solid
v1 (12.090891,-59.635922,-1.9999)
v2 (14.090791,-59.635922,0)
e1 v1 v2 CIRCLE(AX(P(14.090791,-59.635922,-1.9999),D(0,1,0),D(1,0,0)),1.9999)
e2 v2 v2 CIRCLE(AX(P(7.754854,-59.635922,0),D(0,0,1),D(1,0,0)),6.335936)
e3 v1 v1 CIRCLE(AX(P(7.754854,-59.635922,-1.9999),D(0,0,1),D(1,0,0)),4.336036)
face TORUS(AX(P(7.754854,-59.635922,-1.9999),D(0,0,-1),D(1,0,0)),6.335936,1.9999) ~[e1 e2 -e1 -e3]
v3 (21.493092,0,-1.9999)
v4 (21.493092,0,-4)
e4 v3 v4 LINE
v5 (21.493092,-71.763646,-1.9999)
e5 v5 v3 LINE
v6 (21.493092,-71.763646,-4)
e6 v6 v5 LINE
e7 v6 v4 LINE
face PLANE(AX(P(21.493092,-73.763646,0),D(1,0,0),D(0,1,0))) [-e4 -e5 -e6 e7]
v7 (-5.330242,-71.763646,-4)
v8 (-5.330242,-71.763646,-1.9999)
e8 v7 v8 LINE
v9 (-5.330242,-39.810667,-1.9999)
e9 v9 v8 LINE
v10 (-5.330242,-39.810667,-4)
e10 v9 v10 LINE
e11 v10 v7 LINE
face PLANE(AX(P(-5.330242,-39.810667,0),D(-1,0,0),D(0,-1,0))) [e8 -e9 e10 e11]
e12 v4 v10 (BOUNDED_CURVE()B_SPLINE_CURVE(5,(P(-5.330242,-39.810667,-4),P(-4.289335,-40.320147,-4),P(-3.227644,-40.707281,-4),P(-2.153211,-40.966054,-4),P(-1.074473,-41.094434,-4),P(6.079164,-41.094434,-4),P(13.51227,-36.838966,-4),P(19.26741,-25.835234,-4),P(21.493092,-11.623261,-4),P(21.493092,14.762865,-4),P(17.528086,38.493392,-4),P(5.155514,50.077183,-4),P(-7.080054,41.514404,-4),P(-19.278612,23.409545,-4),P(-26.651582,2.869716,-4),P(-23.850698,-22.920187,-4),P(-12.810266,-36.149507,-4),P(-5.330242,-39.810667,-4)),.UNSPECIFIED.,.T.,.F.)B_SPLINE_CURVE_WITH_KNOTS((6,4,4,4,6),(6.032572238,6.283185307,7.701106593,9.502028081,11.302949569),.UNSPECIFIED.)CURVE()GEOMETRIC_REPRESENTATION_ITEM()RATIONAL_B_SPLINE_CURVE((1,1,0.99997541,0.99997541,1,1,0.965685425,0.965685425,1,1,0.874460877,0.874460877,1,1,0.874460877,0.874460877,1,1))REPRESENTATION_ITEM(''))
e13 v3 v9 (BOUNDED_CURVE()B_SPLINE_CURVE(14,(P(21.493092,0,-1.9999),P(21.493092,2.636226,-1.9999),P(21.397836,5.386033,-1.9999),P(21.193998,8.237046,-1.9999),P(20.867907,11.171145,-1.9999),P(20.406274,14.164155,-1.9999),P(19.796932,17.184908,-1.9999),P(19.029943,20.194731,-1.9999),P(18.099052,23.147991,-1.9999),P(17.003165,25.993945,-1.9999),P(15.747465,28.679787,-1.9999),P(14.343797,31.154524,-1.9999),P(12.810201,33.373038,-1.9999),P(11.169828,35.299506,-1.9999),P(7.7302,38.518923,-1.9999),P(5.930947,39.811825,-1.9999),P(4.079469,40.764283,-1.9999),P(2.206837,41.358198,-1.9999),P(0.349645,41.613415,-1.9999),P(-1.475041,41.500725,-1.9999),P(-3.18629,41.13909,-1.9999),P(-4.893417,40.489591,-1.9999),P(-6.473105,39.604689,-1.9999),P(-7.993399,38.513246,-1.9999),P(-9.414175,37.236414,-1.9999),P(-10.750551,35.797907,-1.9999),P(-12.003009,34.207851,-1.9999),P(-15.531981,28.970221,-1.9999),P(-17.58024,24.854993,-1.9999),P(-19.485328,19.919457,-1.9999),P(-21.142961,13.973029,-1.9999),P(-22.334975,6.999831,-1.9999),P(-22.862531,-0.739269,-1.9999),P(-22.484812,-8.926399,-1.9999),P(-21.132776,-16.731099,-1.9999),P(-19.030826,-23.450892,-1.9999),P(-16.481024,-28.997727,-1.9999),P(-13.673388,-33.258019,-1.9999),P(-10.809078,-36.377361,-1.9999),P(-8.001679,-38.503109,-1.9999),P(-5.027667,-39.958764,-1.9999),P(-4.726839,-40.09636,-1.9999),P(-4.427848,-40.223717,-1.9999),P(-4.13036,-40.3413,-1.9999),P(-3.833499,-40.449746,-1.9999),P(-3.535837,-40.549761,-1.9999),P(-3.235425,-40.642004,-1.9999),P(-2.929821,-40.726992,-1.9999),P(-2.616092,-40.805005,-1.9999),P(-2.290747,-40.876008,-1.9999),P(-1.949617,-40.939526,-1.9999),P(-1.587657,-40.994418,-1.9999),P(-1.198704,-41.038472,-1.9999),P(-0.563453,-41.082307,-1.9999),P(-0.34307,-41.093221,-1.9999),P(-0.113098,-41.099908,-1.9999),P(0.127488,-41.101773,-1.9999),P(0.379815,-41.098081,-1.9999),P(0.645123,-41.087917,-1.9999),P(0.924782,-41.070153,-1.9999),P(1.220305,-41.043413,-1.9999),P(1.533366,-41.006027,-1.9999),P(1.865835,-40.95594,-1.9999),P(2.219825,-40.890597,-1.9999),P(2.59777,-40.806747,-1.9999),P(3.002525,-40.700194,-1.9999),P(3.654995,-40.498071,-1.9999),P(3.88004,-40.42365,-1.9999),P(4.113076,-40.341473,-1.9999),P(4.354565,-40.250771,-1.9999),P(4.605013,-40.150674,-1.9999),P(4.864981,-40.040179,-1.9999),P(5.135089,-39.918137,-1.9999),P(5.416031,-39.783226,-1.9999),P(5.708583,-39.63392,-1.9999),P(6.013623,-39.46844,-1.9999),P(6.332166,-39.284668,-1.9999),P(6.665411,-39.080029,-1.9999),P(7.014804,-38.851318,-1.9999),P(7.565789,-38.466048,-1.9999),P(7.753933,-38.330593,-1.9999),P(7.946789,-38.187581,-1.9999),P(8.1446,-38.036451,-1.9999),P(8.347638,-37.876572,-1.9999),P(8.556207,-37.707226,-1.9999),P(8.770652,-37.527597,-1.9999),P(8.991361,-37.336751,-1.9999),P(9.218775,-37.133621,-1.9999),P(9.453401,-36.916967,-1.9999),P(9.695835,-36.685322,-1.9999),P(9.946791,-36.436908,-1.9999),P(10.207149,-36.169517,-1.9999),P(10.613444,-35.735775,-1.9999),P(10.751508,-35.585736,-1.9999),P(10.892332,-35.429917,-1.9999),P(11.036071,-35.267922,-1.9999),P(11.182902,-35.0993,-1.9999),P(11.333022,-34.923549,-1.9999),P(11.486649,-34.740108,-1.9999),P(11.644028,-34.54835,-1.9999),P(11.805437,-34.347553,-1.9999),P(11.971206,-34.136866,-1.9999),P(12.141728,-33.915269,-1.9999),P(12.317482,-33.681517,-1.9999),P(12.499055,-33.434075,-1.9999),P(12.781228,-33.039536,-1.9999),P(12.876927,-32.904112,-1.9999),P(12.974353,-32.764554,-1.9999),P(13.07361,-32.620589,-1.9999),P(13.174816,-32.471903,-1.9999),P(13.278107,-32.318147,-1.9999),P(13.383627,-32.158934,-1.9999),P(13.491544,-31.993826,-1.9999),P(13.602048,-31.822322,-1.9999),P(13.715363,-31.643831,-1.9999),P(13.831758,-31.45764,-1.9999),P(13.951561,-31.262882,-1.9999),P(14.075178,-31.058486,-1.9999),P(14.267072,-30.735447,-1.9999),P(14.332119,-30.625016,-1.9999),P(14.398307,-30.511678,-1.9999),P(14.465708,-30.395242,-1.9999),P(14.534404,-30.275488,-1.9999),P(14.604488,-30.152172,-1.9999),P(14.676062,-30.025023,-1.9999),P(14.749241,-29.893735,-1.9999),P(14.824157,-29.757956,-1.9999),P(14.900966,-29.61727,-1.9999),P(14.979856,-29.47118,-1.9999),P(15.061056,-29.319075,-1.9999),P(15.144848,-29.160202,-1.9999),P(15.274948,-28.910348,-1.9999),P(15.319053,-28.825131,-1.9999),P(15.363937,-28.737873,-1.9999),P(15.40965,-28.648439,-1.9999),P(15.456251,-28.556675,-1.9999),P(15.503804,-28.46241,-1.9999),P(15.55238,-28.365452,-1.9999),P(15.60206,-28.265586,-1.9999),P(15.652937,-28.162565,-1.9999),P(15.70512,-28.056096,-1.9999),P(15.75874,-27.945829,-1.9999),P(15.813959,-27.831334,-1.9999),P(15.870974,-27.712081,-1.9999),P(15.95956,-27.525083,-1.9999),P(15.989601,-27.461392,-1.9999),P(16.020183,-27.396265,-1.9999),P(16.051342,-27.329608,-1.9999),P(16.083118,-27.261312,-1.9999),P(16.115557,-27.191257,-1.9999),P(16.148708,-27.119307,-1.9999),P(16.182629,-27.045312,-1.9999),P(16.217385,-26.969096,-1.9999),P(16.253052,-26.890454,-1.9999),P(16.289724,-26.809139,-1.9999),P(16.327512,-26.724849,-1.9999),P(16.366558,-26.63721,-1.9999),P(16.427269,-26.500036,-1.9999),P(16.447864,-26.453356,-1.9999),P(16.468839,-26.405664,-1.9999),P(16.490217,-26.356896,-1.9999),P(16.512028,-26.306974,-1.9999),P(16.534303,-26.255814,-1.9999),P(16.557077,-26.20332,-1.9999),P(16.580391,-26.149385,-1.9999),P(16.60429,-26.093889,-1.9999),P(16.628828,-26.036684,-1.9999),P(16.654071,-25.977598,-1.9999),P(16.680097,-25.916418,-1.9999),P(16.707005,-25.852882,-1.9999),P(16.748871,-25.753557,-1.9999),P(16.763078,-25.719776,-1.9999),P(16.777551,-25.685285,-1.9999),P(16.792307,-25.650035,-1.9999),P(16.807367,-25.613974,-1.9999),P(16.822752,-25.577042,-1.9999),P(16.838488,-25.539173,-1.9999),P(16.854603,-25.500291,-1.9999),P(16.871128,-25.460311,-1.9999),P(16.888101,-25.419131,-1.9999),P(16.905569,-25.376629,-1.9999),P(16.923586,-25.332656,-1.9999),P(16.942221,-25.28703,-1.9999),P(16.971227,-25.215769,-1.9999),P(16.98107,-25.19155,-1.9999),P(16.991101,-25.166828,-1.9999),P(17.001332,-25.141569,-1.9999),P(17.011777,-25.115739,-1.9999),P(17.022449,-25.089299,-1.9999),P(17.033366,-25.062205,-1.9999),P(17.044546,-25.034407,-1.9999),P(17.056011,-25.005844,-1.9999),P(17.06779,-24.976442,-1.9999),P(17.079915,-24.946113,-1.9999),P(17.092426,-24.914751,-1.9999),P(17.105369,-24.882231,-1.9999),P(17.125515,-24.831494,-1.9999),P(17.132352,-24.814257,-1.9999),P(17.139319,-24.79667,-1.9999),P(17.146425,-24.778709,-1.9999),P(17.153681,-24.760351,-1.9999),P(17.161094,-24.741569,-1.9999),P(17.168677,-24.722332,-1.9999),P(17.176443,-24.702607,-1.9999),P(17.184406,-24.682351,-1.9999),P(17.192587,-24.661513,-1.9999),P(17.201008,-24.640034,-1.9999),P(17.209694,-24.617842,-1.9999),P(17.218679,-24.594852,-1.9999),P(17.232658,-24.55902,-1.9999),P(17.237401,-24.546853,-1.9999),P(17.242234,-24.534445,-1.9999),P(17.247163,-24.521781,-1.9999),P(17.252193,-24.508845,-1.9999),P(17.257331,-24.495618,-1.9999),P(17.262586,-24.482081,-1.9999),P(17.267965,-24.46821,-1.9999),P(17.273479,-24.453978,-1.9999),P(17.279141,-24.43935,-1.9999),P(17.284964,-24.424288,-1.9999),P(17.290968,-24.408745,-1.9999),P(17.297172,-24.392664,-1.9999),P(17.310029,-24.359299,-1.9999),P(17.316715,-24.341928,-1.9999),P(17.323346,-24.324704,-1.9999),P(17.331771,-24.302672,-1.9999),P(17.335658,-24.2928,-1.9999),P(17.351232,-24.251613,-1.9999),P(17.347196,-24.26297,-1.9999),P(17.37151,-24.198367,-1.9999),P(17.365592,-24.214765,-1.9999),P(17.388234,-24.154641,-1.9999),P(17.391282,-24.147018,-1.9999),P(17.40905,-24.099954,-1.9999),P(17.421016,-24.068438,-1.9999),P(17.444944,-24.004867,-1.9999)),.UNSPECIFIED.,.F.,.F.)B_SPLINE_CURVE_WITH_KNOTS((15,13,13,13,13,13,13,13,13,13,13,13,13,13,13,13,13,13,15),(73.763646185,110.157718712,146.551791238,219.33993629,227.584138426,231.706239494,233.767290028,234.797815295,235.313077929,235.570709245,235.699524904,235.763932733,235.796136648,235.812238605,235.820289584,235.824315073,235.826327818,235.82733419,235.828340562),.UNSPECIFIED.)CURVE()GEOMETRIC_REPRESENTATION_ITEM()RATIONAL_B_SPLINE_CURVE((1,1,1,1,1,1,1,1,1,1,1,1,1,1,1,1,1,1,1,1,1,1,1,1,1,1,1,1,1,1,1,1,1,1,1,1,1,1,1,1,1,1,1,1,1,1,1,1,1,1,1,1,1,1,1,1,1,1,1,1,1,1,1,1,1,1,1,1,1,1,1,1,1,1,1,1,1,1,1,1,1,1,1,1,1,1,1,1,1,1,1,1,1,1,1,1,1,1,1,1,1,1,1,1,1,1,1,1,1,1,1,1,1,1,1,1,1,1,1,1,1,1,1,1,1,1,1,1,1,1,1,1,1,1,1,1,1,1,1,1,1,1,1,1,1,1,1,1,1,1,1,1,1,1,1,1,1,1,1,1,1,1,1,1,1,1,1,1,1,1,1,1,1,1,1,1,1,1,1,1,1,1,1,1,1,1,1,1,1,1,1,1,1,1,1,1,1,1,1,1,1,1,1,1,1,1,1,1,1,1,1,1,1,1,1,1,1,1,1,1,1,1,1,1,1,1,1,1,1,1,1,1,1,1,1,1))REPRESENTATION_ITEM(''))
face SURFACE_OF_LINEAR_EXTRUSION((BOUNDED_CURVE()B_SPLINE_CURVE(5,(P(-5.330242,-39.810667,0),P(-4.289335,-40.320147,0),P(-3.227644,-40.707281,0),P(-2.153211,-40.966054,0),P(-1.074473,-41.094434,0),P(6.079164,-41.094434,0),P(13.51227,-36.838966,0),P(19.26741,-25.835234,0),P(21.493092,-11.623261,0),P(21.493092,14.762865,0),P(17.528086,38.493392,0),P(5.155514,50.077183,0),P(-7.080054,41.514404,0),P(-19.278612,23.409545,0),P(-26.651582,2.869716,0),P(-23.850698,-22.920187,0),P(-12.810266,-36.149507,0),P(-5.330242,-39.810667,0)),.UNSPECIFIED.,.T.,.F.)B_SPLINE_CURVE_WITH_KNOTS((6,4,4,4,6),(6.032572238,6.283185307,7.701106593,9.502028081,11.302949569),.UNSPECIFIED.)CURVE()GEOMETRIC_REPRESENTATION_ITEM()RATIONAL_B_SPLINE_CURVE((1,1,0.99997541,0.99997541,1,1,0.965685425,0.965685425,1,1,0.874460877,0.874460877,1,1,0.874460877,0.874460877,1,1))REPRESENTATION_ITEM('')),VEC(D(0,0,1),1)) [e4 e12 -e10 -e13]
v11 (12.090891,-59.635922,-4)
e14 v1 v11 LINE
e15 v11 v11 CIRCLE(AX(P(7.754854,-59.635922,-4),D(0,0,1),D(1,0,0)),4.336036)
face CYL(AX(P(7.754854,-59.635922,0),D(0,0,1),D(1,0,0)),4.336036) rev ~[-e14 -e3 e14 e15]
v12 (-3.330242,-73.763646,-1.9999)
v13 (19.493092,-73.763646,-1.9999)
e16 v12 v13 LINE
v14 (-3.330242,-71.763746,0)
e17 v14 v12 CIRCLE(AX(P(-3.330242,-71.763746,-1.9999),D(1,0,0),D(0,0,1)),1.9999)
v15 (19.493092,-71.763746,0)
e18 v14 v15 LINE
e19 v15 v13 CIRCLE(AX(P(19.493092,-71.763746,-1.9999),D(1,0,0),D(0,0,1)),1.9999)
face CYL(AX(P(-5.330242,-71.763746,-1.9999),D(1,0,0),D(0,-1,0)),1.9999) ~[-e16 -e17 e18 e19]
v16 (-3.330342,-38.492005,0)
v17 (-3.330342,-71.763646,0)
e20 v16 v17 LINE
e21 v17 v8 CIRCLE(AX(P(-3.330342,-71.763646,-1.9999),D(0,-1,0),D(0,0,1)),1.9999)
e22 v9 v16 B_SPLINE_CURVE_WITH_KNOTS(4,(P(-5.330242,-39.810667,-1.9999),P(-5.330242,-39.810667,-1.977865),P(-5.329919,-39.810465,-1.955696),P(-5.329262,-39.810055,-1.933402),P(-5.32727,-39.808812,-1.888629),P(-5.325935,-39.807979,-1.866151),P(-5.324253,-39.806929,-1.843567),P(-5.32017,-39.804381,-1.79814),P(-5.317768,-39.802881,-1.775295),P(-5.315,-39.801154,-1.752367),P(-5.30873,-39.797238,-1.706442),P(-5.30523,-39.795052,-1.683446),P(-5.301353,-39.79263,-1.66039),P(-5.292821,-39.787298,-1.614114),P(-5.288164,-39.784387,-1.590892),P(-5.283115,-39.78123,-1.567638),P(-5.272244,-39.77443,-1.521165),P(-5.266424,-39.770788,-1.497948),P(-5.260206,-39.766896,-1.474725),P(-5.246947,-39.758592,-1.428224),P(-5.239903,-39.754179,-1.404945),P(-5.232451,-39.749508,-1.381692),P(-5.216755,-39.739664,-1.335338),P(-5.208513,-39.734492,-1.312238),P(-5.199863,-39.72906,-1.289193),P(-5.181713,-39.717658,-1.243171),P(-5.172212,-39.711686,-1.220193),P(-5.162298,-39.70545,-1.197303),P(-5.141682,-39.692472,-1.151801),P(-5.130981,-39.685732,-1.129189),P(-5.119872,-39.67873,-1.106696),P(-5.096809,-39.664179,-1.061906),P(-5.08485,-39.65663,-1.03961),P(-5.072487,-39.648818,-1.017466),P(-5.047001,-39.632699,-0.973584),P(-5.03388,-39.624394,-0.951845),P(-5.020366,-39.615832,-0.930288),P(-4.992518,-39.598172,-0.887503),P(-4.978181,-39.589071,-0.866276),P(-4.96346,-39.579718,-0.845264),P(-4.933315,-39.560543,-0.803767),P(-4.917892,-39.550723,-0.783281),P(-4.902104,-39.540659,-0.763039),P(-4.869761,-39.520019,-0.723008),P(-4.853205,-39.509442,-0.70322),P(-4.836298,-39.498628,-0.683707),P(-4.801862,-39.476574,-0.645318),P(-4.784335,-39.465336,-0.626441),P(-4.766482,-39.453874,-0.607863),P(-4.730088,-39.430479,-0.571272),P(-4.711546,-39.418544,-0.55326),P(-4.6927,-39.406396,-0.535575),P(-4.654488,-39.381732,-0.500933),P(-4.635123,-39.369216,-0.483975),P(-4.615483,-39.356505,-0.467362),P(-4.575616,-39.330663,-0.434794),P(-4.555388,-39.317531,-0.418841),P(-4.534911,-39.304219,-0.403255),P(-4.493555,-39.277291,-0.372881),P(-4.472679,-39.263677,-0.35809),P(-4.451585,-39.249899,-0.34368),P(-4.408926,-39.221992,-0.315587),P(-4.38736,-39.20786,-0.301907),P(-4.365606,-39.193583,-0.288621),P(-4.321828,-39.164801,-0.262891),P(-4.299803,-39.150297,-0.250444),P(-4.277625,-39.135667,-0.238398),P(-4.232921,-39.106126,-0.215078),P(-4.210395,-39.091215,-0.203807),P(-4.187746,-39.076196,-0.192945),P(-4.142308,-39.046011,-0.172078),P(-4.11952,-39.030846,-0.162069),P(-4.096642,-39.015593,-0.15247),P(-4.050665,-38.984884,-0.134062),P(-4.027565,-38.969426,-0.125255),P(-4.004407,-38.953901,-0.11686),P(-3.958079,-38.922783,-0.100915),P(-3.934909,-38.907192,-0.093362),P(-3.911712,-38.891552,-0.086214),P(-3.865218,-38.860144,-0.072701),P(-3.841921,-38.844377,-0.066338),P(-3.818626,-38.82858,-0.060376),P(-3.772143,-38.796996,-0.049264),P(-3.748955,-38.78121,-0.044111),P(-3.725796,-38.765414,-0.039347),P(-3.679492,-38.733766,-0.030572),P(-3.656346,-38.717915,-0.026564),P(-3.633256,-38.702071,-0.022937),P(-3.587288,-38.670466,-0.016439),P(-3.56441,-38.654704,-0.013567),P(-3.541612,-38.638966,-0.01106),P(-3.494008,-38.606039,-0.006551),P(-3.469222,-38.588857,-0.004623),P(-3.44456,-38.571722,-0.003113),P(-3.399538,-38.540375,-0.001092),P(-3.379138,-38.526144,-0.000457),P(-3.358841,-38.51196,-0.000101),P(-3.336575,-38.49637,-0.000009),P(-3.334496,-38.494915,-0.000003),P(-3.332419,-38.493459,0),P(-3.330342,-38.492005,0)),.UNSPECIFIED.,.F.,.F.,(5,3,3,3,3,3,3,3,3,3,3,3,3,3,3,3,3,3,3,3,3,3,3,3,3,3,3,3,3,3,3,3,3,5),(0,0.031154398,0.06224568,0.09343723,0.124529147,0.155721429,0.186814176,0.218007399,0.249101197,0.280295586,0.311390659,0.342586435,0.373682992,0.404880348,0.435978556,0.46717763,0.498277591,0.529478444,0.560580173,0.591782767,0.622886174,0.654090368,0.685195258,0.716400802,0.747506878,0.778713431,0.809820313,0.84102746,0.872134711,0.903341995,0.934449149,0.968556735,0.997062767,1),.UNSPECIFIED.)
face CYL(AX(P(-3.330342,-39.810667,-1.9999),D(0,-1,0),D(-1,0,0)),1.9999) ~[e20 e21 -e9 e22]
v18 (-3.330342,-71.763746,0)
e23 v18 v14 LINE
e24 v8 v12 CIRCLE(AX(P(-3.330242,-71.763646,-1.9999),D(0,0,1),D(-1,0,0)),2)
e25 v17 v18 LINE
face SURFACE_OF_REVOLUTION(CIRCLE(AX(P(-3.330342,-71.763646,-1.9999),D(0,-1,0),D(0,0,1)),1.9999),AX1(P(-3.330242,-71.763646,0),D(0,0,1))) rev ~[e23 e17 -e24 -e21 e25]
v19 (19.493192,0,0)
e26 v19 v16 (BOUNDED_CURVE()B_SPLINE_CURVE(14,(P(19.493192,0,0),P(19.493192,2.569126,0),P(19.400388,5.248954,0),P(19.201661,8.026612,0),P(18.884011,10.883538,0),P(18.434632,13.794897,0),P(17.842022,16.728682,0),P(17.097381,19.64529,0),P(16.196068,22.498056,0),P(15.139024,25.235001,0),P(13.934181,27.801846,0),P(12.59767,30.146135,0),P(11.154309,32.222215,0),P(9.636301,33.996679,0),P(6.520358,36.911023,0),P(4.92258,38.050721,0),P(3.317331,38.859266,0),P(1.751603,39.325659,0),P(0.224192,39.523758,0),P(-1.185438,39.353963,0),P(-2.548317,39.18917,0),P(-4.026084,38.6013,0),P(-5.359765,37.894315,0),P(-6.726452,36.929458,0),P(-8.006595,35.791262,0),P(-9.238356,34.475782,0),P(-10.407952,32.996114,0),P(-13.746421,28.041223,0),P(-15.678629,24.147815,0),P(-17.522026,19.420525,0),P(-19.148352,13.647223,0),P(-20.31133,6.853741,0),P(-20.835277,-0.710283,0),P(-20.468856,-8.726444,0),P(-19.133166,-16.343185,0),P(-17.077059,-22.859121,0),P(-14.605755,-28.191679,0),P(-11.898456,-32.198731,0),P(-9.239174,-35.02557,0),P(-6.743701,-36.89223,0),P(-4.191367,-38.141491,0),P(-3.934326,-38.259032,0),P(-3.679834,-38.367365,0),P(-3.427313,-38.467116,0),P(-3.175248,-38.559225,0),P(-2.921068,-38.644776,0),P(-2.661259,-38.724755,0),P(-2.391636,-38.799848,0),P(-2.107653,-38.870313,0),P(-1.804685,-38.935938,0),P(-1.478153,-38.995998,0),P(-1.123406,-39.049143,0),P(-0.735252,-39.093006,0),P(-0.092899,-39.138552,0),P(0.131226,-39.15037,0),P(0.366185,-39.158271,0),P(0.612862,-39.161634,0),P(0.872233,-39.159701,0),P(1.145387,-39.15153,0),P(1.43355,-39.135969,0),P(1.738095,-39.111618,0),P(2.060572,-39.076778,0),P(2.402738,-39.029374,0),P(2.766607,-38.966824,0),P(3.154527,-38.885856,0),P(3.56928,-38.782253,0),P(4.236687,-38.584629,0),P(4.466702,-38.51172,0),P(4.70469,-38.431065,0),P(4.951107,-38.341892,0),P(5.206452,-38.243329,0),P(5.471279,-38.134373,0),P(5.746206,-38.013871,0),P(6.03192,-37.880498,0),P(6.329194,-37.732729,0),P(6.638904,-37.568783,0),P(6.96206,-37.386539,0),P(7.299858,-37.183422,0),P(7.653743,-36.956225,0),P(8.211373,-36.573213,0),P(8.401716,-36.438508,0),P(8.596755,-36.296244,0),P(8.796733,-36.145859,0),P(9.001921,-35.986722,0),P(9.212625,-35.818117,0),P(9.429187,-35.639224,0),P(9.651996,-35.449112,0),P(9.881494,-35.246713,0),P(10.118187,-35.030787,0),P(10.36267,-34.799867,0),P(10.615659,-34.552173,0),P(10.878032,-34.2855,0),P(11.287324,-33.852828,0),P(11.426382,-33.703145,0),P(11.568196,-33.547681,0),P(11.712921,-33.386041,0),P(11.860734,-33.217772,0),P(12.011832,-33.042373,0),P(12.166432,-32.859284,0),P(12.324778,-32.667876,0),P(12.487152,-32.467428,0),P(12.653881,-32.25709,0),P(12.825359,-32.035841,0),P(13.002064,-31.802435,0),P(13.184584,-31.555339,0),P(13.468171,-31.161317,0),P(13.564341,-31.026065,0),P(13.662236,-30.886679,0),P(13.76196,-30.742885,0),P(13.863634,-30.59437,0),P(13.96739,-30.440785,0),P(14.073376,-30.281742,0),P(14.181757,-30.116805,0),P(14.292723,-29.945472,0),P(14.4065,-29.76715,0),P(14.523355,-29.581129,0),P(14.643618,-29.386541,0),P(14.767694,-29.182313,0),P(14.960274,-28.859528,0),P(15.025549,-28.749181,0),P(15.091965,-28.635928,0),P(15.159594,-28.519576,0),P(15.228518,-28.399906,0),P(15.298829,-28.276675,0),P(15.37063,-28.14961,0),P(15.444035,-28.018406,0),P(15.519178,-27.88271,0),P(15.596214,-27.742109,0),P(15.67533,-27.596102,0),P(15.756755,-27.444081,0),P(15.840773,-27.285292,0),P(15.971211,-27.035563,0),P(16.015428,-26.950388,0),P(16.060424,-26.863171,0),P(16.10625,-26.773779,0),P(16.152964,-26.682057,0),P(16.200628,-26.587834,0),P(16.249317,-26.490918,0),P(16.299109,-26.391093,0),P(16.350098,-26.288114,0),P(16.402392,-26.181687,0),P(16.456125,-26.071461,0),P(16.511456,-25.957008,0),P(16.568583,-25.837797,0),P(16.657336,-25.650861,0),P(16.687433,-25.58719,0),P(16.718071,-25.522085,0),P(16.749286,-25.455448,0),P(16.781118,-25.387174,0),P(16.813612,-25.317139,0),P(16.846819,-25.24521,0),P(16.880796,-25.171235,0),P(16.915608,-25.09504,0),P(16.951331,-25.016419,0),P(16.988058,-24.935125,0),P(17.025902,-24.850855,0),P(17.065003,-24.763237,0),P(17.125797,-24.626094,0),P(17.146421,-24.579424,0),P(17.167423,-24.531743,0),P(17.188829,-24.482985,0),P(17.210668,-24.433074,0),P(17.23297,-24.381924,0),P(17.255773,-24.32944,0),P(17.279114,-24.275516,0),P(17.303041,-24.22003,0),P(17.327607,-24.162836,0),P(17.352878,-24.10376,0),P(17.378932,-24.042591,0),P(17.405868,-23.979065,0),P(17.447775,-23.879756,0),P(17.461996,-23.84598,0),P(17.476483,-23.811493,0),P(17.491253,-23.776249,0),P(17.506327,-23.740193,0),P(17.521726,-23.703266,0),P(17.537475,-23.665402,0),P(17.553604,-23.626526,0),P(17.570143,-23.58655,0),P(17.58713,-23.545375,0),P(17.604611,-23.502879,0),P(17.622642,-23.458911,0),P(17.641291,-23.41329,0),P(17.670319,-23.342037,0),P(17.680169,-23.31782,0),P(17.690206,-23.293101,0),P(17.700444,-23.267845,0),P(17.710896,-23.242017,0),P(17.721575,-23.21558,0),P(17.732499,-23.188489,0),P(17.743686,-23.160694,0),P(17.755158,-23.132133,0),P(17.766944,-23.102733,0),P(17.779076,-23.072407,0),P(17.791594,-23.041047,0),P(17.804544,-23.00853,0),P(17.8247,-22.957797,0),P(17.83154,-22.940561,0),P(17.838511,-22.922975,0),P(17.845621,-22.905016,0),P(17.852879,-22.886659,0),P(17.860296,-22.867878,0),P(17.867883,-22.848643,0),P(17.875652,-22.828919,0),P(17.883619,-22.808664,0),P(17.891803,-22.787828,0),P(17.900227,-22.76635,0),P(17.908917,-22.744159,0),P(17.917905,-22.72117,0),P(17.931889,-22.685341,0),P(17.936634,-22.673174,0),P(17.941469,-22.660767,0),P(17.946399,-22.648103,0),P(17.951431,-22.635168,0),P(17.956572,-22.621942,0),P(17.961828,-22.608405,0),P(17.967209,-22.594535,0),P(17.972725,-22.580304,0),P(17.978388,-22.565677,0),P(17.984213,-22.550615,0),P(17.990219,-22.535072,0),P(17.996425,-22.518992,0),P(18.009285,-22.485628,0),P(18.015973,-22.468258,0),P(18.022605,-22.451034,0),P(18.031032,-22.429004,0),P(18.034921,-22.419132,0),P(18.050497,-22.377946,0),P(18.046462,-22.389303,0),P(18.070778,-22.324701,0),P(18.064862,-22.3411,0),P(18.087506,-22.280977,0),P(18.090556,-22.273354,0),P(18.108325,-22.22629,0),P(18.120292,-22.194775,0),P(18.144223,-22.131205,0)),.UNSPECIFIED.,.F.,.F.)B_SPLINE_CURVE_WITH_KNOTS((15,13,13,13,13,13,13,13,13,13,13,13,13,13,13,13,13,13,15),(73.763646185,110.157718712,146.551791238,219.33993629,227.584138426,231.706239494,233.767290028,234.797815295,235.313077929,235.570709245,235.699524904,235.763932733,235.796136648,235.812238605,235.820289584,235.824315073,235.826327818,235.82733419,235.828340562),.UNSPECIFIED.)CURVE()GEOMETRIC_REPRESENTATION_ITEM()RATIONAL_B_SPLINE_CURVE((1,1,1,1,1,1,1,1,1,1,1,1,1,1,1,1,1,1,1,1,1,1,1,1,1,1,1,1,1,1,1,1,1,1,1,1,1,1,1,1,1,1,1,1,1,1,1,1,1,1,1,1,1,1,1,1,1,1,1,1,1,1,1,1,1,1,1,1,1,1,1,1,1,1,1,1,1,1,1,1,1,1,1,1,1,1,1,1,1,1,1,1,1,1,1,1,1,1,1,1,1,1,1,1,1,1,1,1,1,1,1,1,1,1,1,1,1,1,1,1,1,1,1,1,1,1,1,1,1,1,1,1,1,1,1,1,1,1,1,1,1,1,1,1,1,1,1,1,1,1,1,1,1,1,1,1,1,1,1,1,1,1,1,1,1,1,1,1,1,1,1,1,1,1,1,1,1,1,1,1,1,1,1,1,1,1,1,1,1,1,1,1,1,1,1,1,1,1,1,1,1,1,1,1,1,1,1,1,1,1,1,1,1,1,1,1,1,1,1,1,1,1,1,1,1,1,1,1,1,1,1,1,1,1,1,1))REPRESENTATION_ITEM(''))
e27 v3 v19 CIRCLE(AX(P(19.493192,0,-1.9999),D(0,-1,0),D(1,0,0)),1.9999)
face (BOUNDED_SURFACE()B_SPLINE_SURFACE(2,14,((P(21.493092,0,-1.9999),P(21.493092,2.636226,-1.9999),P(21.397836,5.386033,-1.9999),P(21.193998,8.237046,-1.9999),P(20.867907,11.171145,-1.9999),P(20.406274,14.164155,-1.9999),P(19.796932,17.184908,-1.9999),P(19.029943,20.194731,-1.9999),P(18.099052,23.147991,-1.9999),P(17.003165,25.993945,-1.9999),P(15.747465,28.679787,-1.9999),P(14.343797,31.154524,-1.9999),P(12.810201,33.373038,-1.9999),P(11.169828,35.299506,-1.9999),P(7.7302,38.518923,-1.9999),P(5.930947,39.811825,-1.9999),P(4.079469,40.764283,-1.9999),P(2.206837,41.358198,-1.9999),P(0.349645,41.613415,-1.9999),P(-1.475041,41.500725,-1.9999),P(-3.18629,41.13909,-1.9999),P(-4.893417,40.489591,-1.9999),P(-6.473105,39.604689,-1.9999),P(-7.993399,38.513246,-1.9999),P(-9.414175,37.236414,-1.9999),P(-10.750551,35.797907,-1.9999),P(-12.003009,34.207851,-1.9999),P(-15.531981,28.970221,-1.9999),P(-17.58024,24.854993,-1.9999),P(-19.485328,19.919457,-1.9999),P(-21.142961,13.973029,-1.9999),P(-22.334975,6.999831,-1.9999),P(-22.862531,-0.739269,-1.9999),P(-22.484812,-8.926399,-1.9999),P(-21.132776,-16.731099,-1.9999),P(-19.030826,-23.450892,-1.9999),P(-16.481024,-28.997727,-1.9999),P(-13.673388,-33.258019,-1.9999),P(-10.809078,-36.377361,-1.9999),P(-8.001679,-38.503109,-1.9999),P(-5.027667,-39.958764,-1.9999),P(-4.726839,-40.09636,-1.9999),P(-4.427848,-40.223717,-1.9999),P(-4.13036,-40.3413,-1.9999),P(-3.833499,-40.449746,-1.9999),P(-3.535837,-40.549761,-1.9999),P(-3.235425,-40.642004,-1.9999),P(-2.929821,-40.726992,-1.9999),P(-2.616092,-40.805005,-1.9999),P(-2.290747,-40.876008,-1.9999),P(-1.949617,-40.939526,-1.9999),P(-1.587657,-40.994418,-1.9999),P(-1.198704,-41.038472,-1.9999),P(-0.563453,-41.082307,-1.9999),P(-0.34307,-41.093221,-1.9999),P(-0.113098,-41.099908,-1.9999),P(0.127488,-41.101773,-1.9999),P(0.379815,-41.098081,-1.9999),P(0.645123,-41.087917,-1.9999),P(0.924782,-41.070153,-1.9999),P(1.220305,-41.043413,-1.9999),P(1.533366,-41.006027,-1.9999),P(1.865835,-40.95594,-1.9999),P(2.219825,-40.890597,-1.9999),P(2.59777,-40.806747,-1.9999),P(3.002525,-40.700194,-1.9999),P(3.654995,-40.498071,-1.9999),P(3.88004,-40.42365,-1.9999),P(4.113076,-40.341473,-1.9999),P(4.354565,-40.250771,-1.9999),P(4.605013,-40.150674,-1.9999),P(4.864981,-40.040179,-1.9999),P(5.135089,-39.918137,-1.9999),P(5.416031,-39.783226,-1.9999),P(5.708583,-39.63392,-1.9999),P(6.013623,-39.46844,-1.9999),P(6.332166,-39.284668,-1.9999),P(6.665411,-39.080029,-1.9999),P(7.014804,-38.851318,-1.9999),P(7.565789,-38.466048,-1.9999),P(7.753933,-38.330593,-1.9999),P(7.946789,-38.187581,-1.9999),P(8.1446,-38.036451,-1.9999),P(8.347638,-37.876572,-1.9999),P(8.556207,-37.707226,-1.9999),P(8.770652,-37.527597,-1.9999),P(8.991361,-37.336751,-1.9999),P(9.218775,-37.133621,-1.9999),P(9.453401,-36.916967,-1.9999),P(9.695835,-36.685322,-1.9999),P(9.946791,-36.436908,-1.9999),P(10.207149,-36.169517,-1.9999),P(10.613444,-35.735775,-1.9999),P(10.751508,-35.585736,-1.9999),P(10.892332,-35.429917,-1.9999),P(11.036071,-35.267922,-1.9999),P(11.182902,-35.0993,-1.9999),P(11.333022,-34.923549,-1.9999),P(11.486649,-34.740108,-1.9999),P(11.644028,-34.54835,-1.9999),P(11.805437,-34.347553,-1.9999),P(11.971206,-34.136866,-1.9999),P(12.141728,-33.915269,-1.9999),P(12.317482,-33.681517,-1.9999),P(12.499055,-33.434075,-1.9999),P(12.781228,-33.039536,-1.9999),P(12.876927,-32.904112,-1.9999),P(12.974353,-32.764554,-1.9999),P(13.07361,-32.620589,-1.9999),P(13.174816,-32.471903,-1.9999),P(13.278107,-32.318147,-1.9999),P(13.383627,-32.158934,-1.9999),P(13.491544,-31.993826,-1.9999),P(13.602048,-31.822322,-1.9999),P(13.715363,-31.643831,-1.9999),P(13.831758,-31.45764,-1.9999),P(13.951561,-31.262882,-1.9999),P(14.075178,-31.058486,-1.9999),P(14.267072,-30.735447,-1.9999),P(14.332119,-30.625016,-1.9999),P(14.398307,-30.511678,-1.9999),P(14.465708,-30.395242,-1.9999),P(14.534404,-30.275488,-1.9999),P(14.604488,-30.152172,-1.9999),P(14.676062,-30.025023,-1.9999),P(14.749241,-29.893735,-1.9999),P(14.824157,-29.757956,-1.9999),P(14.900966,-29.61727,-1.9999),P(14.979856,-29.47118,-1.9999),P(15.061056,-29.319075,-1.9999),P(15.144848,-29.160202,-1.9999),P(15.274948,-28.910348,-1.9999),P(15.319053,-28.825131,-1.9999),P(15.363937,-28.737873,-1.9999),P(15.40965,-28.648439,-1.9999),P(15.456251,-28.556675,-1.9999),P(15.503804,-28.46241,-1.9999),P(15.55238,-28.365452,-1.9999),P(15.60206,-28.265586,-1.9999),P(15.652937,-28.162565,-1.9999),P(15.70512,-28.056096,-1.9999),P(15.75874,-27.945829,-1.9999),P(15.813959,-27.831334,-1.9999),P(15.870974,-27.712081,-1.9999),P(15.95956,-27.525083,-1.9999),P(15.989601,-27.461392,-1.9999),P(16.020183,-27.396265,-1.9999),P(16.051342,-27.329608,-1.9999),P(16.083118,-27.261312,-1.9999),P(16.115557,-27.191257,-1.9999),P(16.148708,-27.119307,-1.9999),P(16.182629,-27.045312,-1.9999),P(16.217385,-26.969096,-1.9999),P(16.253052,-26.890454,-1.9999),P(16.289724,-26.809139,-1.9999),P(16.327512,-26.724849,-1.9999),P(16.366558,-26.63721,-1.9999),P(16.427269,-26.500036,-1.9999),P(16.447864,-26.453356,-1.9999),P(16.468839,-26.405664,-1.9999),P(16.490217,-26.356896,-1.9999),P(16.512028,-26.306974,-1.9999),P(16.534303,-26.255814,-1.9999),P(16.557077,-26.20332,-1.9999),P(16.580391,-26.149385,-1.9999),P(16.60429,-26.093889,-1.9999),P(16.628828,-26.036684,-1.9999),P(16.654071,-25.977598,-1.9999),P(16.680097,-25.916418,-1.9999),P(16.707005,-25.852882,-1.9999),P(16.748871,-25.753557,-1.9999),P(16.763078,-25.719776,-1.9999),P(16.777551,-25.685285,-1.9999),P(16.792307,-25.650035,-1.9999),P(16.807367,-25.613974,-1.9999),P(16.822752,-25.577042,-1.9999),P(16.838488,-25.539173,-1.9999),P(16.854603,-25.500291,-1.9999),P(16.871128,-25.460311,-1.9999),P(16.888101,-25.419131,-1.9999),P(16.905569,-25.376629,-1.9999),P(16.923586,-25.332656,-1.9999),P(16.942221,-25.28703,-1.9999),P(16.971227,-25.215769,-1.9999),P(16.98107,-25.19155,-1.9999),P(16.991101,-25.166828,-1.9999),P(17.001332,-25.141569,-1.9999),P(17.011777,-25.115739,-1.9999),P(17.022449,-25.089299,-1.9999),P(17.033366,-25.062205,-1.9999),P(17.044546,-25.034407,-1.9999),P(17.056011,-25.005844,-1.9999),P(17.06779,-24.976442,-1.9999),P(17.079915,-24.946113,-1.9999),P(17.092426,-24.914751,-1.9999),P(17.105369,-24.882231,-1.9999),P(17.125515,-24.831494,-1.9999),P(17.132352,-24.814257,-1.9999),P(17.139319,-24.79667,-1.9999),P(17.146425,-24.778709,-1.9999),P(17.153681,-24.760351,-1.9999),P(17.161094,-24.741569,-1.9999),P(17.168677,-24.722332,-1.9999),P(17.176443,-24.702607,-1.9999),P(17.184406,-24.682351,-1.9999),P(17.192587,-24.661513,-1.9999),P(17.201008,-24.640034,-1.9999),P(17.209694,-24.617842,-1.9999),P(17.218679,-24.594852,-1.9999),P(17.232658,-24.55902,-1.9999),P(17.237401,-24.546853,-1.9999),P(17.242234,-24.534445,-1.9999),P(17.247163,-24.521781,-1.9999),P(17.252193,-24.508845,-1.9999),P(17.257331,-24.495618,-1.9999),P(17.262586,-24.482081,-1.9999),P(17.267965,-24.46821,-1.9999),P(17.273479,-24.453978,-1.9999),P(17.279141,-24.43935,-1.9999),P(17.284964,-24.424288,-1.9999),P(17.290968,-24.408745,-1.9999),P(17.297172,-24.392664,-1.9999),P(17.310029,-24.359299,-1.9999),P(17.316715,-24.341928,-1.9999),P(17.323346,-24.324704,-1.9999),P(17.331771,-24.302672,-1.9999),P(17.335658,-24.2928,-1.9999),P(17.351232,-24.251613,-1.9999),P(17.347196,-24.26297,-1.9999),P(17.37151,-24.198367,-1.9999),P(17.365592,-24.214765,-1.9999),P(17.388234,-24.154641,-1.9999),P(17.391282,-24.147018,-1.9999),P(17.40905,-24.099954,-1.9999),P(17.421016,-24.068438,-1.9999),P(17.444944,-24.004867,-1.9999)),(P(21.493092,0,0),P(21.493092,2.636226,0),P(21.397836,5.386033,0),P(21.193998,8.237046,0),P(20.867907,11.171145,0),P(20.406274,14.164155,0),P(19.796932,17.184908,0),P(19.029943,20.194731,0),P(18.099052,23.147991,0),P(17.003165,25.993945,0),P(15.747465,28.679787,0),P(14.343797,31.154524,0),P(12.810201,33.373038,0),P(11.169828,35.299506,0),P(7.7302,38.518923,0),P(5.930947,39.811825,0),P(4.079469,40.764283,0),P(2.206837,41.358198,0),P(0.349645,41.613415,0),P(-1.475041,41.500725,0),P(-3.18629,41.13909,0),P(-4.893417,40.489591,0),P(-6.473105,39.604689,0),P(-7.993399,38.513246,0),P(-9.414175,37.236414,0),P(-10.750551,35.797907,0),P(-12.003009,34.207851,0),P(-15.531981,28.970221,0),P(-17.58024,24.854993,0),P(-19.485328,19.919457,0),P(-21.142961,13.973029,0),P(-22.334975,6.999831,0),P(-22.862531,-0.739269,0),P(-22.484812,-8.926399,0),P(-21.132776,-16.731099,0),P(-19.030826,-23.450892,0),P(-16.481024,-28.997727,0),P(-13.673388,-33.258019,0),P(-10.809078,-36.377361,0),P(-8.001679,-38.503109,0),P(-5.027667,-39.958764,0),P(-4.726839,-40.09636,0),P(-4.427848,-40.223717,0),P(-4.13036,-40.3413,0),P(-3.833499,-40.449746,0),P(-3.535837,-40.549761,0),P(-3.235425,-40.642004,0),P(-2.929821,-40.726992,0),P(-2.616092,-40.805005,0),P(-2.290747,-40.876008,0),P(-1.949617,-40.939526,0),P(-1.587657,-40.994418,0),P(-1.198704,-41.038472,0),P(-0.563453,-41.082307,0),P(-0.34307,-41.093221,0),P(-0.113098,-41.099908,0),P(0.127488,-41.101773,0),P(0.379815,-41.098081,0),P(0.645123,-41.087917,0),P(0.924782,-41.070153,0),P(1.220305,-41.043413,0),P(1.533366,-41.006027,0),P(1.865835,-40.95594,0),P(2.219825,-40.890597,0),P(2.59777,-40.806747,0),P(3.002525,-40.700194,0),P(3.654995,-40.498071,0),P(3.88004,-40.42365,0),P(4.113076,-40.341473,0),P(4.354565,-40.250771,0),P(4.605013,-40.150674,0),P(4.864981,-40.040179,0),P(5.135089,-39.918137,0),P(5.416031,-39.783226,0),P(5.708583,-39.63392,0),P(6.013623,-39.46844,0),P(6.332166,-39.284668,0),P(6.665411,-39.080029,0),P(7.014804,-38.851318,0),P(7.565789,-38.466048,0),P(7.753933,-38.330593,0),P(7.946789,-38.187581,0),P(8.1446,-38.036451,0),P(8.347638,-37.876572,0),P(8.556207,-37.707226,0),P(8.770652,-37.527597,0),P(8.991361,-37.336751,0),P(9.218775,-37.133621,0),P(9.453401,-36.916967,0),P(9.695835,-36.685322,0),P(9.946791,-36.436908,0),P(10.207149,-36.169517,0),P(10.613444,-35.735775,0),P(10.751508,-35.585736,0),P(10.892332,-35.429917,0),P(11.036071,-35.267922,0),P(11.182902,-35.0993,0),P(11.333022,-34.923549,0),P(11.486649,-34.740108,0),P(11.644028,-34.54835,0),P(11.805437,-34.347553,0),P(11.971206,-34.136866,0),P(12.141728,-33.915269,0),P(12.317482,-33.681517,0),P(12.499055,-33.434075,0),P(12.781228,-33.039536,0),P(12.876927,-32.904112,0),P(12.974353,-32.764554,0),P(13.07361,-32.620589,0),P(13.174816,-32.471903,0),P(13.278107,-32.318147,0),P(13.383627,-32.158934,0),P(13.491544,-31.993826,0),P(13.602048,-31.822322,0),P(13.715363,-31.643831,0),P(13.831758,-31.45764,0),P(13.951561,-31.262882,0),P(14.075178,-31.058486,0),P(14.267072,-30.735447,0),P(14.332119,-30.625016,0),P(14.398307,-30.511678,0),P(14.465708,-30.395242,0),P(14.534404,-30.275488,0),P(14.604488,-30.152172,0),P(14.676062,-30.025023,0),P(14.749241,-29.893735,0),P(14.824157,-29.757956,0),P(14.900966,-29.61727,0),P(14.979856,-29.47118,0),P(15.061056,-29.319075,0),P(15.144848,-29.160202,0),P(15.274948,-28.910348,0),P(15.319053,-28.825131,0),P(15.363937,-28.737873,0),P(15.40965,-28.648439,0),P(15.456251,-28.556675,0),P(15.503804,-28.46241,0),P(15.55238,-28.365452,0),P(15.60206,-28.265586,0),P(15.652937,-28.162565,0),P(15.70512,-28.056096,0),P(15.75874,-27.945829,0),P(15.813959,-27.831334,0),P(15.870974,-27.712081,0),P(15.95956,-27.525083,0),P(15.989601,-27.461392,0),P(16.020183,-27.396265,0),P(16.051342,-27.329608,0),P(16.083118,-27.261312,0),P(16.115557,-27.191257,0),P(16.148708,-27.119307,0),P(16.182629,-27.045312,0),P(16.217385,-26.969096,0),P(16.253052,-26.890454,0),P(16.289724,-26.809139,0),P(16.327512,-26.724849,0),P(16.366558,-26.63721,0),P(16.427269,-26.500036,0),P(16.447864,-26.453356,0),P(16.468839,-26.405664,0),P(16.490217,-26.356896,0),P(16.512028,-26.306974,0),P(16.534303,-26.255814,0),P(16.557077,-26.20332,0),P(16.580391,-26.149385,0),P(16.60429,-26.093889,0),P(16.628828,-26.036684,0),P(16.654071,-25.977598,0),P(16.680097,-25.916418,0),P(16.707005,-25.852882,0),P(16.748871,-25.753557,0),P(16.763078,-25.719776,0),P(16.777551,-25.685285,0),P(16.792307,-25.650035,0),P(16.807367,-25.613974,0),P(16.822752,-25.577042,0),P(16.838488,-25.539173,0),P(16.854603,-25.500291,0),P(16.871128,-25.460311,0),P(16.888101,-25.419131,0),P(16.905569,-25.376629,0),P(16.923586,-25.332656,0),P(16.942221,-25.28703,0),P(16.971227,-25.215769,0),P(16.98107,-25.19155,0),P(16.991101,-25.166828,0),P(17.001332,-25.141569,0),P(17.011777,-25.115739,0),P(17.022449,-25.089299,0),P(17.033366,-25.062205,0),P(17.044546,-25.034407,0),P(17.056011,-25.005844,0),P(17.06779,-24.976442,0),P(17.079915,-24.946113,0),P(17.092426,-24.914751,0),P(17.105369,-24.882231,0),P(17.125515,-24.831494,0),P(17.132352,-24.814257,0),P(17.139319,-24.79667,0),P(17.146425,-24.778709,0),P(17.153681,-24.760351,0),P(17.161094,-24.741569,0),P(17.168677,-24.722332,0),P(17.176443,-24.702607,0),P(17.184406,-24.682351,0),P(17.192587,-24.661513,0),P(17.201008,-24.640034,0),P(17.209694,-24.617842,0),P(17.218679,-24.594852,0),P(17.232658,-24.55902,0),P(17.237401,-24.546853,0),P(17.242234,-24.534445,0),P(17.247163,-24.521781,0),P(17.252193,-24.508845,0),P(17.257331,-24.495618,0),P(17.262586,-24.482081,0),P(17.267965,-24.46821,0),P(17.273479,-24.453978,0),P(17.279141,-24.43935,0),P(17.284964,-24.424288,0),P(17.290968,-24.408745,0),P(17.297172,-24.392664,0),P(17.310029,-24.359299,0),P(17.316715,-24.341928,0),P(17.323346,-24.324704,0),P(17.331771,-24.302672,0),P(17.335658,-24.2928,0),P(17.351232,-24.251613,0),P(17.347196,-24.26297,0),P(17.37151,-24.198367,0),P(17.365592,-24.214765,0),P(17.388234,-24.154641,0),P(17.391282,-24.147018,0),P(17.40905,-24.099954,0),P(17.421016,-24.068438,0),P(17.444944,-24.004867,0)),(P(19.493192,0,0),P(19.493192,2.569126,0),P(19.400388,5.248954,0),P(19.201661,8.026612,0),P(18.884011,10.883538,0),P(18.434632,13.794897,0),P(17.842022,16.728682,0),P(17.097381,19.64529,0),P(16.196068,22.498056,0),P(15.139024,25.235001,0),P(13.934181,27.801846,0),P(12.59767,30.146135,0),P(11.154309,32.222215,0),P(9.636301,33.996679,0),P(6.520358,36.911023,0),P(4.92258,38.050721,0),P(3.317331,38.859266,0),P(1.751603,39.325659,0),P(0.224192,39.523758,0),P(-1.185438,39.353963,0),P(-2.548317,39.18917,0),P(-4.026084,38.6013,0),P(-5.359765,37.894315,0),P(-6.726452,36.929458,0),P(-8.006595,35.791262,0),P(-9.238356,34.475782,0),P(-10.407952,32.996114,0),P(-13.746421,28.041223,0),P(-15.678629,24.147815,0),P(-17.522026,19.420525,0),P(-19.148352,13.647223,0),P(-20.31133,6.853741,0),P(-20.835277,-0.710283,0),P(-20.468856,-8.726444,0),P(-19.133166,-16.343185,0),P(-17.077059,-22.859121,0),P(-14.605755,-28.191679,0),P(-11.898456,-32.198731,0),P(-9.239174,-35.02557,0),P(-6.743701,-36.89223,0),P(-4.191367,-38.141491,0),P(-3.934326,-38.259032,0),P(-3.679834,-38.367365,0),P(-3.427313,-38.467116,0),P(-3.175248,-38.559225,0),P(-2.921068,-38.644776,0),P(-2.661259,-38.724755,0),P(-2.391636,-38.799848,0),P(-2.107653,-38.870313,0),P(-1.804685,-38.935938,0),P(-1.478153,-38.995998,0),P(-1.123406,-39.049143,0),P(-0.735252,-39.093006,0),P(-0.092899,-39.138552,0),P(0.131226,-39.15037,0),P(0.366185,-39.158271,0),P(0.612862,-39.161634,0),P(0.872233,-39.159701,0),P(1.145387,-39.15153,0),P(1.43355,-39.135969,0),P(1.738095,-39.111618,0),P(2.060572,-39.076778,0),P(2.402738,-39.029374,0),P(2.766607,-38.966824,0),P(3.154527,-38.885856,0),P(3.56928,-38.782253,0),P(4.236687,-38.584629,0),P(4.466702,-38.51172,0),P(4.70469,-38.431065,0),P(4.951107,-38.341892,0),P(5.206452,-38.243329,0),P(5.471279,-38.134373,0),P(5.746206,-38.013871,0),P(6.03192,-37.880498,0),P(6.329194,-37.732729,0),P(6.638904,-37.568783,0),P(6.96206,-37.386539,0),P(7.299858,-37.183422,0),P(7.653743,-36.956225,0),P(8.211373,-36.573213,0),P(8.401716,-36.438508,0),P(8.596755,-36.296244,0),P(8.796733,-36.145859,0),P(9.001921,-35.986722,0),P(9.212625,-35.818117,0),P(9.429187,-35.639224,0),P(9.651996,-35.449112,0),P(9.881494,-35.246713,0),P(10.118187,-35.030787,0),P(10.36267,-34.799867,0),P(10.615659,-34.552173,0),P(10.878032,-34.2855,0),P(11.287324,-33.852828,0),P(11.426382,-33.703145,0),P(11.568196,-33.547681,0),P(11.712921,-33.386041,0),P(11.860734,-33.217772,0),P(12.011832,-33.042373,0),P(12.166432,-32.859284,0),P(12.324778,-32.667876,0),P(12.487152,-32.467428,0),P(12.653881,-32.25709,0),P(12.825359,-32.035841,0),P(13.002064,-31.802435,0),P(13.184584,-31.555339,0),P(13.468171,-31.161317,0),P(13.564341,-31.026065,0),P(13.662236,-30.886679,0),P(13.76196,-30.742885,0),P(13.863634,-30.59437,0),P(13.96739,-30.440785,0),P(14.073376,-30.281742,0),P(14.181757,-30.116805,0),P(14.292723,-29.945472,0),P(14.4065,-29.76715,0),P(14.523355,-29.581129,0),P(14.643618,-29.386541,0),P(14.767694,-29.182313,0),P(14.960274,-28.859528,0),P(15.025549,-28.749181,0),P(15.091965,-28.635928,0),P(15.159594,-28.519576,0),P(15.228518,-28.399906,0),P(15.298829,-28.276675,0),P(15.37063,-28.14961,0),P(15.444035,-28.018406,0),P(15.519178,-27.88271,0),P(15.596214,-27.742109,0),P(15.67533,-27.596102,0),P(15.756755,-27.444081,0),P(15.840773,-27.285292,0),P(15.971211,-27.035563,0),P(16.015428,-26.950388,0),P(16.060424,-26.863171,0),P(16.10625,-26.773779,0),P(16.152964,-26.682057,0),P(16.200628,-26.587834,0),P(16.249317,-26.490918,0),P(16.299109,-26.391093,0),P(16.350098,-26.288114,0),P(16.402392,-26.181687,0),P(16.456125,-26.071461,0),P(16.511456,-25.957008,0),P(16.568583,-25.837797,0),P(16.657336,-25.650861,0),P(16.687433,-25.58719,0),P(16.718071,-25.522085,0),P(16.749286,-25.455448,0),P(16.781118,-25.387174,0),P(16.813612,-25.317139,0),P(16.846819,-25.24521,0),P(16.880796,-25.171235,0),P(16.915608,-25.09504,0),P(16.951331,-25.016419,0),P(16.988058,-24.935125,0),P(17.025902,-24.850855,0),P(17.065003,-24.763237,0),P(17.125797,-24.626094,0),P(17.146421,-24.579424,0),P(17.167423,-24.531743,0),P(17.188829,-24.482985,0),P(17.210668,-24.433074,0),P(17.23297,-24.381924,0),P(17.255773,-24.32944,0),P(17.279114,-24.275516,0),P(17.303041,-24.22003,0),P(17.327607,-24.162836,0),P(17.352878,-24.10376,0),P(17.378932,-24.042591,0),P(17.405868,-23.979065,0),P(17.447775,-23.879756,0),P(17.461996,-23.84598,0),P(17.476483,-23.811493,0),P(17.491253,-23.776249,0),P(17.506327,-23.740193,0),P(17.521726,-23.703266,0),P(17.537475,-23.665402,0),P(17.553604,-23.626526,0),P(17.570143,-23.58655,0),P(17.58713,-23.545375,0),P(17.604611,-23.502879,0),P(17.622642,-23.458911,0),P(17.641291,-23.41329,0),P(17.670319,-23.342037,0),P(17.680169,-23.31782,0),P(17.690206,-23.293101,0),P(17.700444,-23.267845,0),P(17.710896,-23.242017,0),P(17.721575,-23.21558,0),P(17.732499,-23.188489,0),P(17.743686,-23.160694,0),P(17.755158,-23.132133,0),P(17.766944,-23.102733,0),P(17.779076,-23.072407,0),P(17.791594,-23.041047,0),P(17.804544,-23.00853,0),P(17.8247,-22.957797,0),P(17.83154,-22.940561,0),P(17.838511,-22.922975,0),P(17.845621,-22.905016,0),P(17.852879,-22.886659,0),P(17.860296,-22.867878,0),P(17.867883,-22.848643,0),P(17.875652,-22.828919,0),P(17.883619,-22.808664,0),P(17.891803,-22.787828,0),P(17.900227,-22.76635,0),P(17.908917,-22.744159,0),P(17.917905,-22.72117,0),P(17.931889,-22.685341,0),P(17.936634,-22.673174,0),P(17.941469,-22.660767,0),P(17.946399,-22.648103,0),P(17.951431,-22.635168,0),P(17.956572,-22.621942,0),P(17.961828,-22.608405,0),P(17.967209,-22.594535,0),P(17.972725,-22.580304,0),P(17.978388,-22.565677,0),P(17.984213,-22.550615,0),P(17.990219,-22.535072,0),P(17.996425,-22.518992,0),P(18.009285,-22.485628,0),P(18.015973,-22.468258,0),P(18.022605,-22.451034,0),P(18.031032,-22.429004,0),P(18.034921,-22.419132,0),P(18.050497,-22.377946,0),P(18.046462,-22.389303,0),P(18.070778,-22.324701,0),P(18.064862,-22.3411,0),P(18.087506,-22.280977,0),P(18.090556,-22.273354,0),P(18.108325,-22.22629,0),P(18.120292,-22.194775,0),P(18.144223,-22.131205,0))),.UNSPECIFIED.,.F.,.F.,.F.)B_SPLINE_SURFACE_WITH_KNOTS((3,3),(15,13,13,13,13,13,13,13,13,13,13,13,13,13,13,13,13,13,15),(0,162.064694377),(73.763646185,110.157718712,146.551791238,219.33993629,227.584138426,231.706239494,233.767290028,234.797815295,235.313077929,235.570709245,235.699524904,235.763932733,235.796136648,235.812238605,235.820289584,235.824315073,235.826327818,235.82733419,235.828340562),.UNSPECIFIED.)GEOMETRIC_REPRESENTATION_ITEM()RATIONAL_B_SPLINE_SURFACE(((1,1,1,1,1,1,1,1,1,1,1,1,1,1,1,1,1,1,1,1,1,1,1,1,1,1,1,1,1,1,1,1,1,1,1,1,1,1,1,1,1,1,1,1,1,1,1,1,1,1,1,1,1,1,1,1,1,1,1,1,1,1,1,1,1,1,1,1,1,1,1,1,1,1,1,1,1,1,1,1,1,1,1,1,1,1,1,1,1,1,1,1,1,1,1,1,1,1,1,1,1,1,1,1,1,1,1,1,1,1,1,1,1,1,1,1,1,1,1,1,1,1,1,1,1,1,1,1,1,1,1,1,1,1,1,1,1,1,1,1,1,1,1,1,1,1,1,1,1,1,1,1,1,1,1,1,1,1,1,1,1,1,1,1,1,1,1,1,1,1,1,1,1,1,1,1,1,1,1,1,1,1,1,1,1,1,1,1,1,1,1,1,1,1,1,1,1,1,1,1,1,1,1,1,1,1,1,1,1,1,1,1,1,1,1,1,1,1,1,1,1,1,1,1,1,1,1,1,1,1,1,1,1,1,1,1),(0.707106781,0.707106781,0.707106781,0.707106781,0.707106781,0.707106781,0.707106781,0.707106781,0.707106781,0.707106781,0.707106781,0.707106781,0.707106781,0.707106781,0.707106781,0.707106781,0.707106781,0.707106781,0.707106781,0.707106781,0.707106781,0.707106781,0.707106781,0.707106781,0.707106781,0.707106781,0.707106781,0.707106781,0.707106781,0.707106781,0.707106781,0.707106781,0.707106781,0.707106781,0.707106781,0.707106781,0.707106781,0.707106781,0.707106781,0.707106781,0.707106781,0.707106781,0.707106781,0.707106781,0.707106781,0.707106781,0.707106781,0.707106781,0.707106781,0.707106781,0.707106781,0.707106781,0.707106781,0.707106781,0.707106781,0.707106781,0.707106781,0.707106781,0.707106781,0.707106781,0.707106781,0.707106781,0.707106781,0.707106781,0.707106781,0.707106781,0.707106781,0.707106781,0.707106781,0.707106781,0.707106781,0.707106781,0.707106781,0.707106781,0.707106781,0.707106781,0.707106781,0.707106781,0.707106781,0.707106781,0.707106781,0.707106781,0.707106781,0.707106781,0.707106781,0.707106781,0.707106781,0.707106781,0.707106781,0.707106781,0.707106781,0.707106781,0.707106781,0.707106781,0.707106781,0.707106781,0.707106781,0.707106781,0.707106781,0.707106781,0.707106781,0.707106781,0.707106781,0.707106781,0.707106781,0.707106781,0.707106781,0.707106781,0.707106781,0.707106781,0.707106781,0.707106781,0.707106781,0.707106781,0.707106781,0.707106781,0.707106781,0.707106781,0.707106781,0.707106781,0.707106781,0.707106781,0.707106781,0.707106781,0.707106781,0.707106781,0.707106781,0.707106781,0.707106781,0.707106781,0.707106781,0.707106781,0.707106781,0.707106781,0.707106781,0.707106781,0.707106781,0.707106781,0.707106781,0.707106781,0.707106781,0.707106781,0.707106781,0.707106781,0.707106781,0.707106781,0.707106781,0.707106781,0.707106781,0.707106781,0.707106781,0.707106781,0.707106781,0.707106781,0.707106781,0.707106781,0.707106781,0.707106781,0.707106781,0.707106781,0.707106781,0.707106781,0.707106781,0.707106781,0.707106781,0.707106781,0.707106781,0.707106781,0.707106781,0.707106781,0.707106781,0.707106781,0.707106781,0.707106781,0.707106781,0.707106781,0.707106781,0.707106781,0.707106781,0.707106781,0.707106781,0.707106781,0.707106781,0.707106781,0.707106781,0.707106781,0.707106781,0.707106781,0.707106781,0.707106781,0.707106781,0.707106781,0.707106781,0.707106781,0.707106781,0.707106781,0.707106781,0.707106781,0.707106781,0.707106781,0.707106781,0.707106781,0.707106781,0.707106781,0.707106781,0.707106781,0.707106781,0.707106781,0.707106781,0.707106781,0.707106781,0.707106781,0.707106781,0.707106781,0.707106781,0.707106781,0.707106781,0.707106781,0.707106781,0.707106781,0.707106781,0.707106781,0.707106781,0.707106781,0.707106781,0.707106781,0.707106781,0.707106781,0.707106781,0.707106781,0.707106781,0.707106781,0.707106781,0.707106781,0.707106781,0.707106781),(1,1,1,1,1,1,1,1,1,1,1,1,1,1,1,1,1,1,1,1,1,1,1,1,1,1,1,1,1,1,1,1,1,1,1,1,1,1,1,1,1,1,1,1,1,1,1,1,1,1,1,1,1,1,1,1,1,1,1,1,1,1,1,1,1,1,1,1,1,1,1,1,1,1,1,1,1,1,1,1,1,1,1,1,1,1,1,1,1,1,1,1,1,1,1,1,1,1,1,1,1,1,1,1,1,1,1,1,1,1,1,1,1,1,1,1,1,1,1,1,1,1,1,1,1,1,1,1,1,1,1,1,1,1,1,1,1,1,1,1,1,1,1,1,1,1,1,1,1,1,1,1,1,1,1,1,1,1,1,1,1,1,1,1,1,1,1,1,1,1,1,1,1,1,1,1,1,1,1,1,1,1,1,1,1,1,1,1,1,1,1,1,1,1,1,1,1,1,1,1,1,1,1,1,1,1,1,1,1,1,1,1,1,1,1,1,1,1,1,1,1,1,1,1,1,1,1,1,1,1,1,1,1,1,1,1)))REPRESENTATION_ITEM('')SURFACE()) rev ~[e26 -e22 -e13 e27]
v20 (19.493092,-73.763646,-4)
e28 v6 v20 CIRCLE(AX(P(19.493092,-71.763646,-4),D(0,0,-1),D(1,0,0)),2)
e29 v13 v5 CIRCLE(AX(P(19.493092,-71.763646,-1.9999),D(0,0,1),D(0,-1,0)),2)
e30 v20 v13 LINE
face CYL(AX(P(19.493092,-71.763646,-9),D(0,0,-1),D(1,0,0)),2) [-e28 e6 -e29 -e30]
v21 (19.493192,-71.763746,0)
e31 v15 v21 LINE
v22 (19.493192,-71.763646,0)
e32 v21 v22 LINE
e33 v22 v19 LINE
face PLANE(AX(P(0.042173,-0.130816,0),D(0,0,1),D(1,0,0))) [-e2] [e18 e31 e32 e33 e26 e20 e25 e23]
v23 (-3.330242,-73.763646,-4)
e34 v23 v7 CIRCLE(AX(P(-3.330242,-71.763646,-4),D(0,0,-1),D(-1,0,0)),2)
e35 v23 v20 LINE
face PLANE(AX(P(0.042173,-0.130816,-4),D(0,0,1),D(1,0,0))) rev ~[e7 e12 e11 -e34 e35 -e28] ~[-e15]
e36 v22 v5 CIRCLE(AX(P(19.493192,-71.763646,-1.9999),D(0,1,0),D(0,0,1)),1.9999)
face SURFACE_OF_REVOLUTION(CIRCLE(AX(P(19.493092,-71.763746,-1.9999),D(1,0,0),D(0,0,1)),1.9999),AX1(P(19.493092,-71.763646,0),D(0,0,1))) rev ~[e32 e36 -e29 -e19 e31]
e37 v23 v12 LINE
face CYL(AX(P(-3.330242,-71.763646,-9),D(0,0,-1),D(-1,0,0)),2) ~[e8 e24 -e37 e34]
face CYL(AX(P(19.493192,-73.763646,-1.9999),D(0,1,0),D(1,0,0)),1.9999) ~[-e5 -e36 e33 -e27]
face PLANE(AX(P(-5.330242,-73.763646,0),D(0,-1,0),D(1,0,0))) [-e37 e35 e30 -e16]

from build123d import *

# Parameters (mm, degrees)
F0_R        = 4.336036498
F1_DEPTH    = 4
F2_R        = 1.9999
F3_T1_DEPTH = 9
F3_T4_ANGLE = 90
F3_T6_ANGLE = 90


# Not quite as in the source:
# - a fillet or chamfer that OpenCascade refuses, or shapes differently, is made with other operations: its cross-section is extruded or revolved along the edge and cut away or added
# - a fillet or chamfer is up to 0.001 mm smaller than in the source, because OpenCascade refuses the exact size


with BuildPart() as f1:
    # F0 (on Top) → F1 (new body)
    with BuildSketch(Plane.XY):
        with BuildLine():
            add(Edge.make_bspline(
                [(-5.3302422166, -39.8106665894), (-2.7074100905, -41.0944335163), (0, -41.0944335163)],
                knots=[6.0325722383, 6.0325722383, 6.0325722383, 6.2831853072, 6.2831853072, 6.2831853072], degree=2, weights=[1, 0.9921594035, 1]))
            add(Edge.make_bspline(
                [(0, -41.0944335163), (21.4930921895, -41.0944335163), (21.4930921895, 0)],
                knots=[0, 0, 0, 1.5707963268, 1.5707963268, 1.5707963268], degree=2, weights=[1, 0.7071067812, 1]))
            add(Edge.make_bspline(
                [(21.4930921895, 0), (21.4930921895, 83.9221072153), (-13.1793327698, 32.4619744443), (-47.8517577291, -18.9981583267), (-5.3302422166, -39.8106665894)],
                knots=[1.5707963268, 1.5707963268, 1.5707963268, 3.8016842826, 3.8016842826, 6.0325722383, 6.0325722383, 6.0325722383], degree=2, weights=[1, 0.4397787878, 1, 0.4397787878, 1]))
        make_face()
        with BuildLine():
            add(Edge.make_bspline(
                [(0, -41.0944335163), (21.4930921895, -41.0944335163), (21.4930921895, 0)],
                knots=[0, 0, 0, 1.5707963268, 1.5707963268, 1.5707963268], degree=2, weights=[1, 0.7071067812, 1]))
            add(Edge.make_bspline(
                [(-5.3302422166, -39.8106665894), (-2.7074100905, -41.0944335163), (0, -41.0944335163)],
                knots=[6.0325722383, 6.0325722383, 6.0325722383, 6.2831853072, 6.2831853072, 6.2831853072], degree=2, weights=[1, 0.9921594035, 1]))
            Line((-5.3302422166, -39.8106665894), (-5.3302422166, -73.7636461854))
            Line((-5.3302422166, -73.7636461854), (21.4930921895, -73.7636461854))
            Line((21.4930921895, -73.7636461854), (21.4930921895, 0))
        make_face()
        with Locations((7.7548543923, -59.6359223127)):
            Circle(F0_R, mode=Mode.SUBTRACT)
    extrude(amount=-F1_DEPTH)

    # F2 (radius 2 in the source; OpenCascade refuses exactly that, so slightly less here)
    f2_edges = [f1.edges().sort_by_distance(p)[0] for p in [
        (-16.104761, 27.214024, 0),
        (-5.330242, -56.787156, 0),
        (8.081425, -73.763646, 0),
        (21.493092, -36.881823, 0),
        (3.418818, -59.635922, 0),
    ]]
    fillet(f2_edges, radius=F2_R)

    # F3: fillet of radius 2 on 2 edges, made by hand

    # F3_s2 → F3_t1 (cut)
    with BuildSketch(Plane.XY.offset(-9)):
        with BuildLine():
            ThreePointArc((21.4930921895, -71.7636461854), (20.9073057519, -73.1778597478), (19.4930921895, -73.7636461854))
            Line((19.4930921895, -73.7636461854), (21.4930921895, -73.7636461854))
            Line((21.4930921895, -73.7636461854), (21.4930921895, -71.7636461854))
        make_face()
        with BuildLine():
            ThreePointArc((-5.3302422166, -71.7636461854), (-4.744455779, -73.1778597478), (-3.3302422166, -73.7636461854))
            Line((-3.3302422166, -73.7636461854), (-5.3302422166, -73.7636461854))
            Line((-5.3302422166, -73.7636461854), (-5.3302422166, -71.7636461854))
        make_face()
    extrude(amount=F3_T1_DEPTH, mode=Mode.SUBTRACT)

    # F3_s3 → F3_t4 (revolve, cut)
    with BuildSketch(Plane.XZ.offset(71.7636461854)):
        with BuildLine():
            ThreePointArc((-3.3303422166, 0), (-4.7444850683, -0.5857571483), (-5.3302422166, -1.9999))
            Line((-5.3302422166, -1.9999), (-5.3302422166, 0))
            Line((-5.3302422166, 0), (-3.3303422166, 0))
        make_face()
    revolve(axis=Axis((-3.3302422166, -71.7636461854, 0), (0, 0, 1)), revolution_arc=F3_T4_ANGLE, mode=Mode.SUBTRACT)

    # F3_s5 → F3_t6 (revolve, cut)
    with BuildSketch(Plane.YZ.offset(19.4930921895)):
        with BuildLine():
            ThreePointArc((-71.7637461854, 0), (-73.1778890371, -0.5857571483), (-73.7636461854, -1.9999))
            Line((-73.7636461854, -1.9999), (-73.7636461854, 0))
            Line((-73.7636461854, 0), (-71.7637461854, 0))
        make_face()
    revolve(axis=Axis((19.4930921895, -71.7636461854, 0), (0, 0, 1)), revolution_arc=F3_T6_ANGLE, mode=Mode.SUBTRACT)


solid = f1.part
